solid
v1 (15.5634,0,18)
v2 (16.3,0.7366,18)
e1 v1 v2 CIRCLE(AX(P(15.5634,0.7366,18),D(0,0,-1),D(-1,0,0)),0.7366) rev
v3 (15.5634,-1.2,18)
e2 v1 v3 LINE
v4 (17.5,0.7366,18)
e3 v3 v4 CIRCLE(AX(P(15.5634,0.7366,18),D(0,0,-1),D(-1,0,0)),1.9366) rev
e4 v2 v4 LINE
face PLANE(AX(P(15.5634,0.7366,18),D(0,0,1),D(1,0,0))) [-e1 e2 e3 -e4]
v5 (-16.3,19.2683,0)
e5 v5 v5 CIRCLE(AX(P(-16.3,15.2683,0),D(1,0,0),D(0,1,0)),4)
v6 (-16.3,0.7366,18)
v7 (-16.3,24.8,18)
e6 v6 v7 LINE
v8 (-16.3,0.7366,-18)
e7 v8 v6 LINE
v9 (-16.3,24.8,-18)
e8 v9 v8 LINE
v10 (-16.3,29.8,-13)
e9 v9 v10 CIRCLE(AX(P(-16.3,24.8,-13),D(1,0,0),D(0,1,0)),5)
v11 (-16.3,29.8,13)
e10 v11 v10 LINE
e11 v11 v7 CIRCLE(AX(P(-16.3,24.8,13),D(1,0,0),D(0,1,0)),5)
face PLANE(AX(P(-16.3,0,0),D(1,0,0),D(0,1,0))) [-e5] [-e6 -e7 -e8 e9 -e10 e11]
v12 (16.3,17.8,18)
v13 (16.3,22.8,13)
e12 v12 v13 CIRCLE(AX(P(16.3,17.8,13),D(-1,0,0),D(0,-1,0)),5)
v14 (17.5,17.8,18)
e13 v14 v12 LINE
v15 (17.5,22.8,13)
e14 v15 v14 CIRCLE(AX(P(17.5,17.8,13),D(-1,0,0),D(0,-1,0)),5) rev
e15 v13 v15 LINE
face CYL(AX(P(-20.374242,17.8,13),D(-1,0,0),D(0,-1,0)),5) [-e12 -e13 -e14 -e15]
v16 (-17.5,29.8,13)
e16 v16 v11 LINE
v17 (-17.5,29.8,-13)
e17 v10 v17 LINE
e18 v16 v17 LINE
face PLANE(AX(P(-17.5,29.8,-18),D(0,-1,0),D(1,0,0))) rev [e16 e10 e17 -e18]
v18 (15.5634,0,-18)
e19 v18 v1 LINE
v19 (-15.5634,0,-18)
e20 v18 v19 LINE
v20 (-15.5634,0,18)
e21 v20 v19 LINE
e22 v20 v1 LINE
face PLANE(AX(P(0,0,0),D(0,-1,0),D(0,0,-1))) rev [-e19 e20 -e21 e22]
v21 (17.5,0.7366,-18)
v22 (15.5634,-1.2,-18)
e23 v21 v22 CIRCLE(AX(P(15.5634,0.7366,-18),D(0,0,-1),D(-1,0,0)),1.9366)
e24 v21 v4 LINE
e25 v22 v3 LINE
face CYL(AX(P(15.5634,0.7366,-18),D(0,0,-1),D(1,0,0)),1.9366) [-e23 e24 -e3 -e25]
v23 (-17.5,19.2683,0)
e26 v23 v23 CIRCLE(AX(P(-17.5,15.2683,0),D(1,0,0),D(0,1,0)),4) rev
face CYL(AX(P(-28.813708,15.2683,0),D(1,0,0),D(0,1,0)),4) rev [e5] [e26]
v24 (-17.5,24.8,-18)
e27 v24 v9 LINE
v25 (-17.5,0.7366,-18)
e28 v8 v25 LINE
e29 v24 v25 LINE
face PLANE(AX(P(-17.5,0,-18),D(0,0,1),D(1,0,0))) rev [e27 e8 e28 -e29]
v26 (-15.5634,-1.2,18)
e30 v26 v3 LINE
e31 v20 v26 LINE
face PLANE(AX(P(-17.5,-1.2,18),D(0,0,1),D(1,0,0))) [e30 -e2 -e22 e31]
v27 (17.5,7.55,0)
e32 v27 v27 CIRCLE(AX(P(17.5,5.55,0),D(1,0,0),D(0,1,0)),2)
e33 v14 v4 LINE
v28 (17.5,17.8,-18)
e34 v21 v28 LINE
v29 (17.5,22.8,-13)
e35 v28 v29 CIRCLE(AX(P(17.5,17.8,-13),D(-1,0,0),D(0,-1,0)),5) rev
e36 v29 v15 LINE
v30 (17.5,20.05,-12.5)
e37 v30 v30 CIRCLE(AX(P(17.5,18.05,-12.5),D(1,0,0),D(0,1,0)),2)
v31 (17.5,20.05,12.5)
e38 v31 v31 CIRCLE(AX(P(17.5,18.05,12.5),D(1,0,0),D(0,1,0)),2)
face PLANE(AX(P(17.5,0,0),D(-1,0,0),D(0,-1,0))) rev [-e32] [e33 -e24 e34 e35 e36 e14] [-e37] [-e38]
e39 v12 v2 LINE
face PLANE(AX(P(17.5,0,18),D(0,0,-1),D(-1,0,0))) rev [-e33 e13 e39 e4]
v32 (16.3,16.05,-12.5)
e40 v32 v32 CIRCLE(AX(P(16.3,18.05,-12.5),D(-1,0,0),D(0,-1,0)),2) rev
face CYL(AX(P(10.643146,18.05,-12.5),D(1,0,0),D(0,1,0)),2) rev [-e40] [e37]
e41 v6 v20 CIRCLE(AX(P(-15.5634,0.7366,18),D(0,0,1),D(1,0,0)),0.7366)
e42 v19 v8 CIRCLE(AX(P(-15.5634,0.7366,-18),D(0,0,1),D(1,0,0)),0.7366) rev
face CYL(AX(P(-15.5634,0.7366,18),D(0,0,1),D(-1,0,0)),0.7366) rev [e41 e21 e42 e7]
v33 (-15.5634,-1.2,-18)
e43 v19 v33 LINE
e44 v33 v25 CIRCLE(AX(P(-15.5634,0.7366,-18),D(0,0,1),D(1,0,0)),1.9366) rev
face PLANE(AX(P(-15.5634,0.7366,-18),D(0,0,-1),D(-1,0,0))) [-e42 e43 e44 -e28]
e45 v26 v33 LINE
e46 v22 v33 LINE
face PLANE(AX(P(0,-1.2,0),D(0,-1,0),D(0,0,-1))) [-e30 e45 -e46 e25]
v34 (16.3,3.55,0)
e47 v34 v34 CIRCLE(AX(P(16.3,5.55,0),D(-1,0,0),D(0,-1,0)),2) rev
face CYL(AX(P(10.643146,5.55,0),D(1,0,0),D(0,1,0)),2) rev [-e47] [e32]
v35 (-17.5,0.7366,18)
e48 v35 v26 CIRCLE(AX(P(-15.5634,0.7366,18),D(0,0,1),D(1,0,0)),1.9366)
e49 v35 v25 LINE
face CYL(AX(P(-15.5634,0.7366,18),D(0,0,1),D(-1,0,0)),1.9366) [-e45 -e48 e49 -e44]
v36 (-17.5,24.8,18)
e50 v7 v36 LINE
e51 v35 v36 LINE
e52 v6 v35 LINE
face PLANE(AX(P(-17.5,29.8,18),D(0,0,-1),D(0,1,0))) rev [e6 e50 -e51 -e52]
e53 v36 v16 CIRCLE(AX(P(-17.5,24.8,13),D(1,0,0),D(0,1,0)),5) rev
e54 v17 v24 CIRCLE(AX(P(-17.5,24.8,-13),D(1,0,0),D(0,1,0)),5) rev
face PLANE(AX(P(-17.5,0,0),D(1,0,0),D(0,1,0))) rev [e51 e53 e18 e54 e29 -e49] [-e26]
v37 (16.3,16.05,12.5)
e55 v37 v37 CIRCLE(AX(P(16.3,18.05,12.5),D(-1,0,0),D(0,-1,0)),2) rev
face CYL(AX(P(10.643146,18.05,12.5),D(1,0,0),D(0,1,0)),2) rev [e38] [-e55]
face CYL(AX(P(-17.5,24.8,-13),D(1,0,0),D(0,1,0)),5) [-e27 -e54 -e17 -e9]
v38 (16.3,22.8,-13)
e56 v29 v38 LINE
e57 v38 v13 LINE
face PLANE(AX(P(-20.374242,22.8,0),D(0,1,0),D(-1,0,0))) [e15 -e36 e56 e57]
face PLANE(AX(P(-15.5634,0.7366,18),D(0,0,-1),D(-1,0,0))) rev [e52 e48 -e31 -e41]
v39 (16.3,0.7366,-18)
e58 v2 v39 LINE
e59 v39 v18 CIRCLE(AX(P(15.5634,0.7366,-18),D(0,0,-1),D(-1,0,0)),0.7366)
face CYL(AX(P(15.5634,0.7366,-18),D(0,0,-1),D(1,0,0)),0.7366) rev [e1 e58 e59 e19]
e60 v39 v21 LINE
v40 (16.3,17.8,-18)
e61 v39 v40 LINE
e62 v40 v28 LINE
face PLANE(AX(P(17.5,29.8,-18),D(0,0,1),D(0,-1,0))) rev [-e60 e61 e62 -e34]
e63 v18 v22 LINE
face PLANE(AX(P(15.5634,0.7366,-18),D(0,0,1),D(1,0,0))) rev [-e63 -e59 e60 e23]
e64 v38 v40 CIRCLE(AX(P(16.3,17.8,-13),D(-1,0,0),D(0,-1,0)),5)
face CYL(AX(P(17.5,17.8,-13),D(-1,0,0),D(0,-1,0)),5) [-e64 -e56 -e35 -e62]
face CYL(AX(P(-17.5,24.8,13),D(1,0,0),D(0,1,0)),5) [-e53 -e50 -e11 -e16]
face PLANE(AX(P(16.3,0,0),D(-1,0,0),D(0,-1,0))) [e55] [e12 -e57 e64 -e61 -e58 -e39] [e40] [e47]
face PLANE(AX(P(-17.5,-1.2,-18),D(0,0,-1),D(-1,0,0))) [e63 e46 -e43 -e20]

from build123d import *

# Parameters (mm, degrees)
CROQUIS1_W                         = 35
CROQUIS1_H                         = 36
BRIDA_BASE1_DEPTH                  = 1.2
BRIDA_DE_ARISTA1_STRIP_W           = 6.2732
BRIDA_DE_ARISTA1_STRIP_H           = 1.2
BRIDA_DE_ARISTA1_STRIP_CUT_DEPTH   = 36
BRIDA_DE_ARISTA1_STRIP_2_W         = 6.2732
BRIDA_DE_ARISTA1_STRIP_2_H         = 1.2
BRIDA_DE_ARISTA1_STRIP_CUT_2_DEPTH = 36
BRIDA_DE_ARISTA1_DEPTH             = 36
BRIDA_DE_ARISTA1_BEND_DEPTH        = 36
CROQUIS14_W                        = 36
CROQUIS14_H                        = 7
CORTAR_EXTRUIR3_DEPTH              = 1.2
CROQUIS12_R                        = 2
CORTAR_EXTRUIR1_DEPTH              = 1.2
CROQUIS13_R                        = 4
CORTAR_EXTRUIR2_DEPTH              = 1.2
REDONDEO1_R                        = 5


# Sheet-metal steps are written as plain solids
with BuildPart() as part:
    # Croquis1 → Brida base1 (new body)
    with BuildSketch(Plane(origin=(0, 0, 0), x_dir=(1, 0, 0), z_dir=(0, 1, 0))):
        Rectangle(CROQUIS1_W, CROQUIS1_H)
    extrude(amount=-BRIDA_BASE1_DEPTH)

    # Brida de arista1 strip (across the edge) → Brida de arista1 strip cut (cut)
    with BuildSketch(Plane(origin=(17.5, 0, 18), x_dir=(-1, 0, 0), z_dir=(0, 0, -1))):
        with Locations((-1.2, -0.6)):
            Rectangle(BRIDA_DE_ARISTA1_STRIP_W, BRIDA_DE_ARISTA1_STRIP_H)
    extrude(amount=BRIDA_DE_ARISTA1_STRIP_CUT_DEPTH, mode=Mode.SUBTRACT)

    # Brida de arista1 strip 2 (across the edge) → Brida de arista1 strip cut 2 (cut)
    with BuildSketch(Plane(origin=(-17.5, 0, -18), x_dir=(1, 0, 0), z_dir=(0, 0, 1))):
        with Locations((-1.2, -0.6)):
            Rectangle(BRIDA_DE_ARISTA1_STRIP_2_W, BRIDA_DE_ARISTA1_STRIP_2_H)
    extrude(amount=BRIDA_DE_ARISTA1_STRIP_CUT_2_DEPTH, mode=Mode.SUBTRACT)

    # Brida de arista1 section (across the edge) → Brida de arista1 (add)
    with BuildSketch(Plane(origin=(17.5, 0, 18), x_dir=(-1, 0, 0), z_dir=(0, 0, -1))):
        with BuildLine():
            Line((0, 0.7366), (0, 29.8))
            Line((0, 29.8), (1.2, 29.8))
            Line((1.2, 29.8), (1.2, 0.7366))
            ThreePointArc((1.2, 0.7366), (1.415745145, 0.215745145), (1.9366, 0))
            Line((1.9366, 0), (1.9366, -1.2))
            ThreePointArc((1.9366, -1.2), (0.567217008, -0.632782992), (0, 0.7366))
        make_face()
    extrude(amount=BRIDA_DE_ARISTA1_DEPTH)

    # Brida de arista1 section 2 (across the edge) → Brida de arista1 bend (add)
    with BuildSketch(Plane(origin=(-17.5, 0, -18), x_dir=(1, 0, 0), z_dir=(0, 0, 1))):
        with BuildLine():
            Line((0, 0.7366), (0, 29.8))
            Line((0, 29.8), (1.2, 29.8))
            Line((1.2, 29.8), (1.2, 0.7366))
            ThreePointArc((1.2, 0.7366), (1.415745145, 0.215745145), (1.9366, 0))
            Line((1.9366, 0), (1.9366, -1.2))
            ThreePointArc((1.9366, -1.2), (0.567217008, -0.632782992), (0, 0.7366))
        make_face()
    extrude(amount=BRIDA_DE_ARISTA1_BEND_DEPTH)

    # Croquis14 → Cortar-Extruir3 (cut)
    with BuildSketch(Plane(origin=(17.5, 0, 0), x_dir=(0, 0, -1), z_dir=(1, 0, 0))):
        with Locations((0, 26.3)):
            Rectangle(CROQUIS14_W, CROQUIS14_H)
    extrude(amount=-CORTAR_EXTRUIR3_DEPTH, mode=Mode.SUBTRACT)

    # Croquis12 → Cortar-Extruir1 (cut)
    with BuildSketch(Plane(origin=(17.5, 0, 0), x_dir=(0, 0, -1), z_dir=(1, 0, 0))):
        with Locations(Location((-12.5, 18.05, 0), (0, 0, 90))):
            Circle(CROQUIS12_R)
        with Locations(Location((12.5, 18.05, 0), (0, 0, 90))):
            Circle(CROQUIS12_R)
        with Locations(Location((0, 5.55, 0), (0, 0, 90))):
            Circle(CROQUIS12_R)
    extrude(amount=-CORTAR_EXTRUIR1_DEPTH, mode=Mode.SUBTRACT)

    # Croquis13 → Cortar-Extruir2 (cut)
    with BuildSketch(Plane(origin=(-16.3, 0, 0), x_dir=(0, 0, -1), z_dir=(1, 0, 0))):
        with Locations(Location((0, 15.2683, 0), (0, 0, 90))):
            Circle(CROQUIS13_R)
    extrude(amount=-CORTAR_EXTRUIR2_DEPTH, mode=Mode.SUBTRACT)

    # Redondeo1
    redondeo1_edges = [part.edges().sort_by_distance(p)[0] for p in [
        (-16.9, 29.8, -18),
        (-16.9, 29.8, 18),
        (16.9, 22.8, 18),
        (16.9, 22.8, -18),
    ]]
    fillet(redondeo1_edges, radius=REDONDEO1_R)


solid = part.part
